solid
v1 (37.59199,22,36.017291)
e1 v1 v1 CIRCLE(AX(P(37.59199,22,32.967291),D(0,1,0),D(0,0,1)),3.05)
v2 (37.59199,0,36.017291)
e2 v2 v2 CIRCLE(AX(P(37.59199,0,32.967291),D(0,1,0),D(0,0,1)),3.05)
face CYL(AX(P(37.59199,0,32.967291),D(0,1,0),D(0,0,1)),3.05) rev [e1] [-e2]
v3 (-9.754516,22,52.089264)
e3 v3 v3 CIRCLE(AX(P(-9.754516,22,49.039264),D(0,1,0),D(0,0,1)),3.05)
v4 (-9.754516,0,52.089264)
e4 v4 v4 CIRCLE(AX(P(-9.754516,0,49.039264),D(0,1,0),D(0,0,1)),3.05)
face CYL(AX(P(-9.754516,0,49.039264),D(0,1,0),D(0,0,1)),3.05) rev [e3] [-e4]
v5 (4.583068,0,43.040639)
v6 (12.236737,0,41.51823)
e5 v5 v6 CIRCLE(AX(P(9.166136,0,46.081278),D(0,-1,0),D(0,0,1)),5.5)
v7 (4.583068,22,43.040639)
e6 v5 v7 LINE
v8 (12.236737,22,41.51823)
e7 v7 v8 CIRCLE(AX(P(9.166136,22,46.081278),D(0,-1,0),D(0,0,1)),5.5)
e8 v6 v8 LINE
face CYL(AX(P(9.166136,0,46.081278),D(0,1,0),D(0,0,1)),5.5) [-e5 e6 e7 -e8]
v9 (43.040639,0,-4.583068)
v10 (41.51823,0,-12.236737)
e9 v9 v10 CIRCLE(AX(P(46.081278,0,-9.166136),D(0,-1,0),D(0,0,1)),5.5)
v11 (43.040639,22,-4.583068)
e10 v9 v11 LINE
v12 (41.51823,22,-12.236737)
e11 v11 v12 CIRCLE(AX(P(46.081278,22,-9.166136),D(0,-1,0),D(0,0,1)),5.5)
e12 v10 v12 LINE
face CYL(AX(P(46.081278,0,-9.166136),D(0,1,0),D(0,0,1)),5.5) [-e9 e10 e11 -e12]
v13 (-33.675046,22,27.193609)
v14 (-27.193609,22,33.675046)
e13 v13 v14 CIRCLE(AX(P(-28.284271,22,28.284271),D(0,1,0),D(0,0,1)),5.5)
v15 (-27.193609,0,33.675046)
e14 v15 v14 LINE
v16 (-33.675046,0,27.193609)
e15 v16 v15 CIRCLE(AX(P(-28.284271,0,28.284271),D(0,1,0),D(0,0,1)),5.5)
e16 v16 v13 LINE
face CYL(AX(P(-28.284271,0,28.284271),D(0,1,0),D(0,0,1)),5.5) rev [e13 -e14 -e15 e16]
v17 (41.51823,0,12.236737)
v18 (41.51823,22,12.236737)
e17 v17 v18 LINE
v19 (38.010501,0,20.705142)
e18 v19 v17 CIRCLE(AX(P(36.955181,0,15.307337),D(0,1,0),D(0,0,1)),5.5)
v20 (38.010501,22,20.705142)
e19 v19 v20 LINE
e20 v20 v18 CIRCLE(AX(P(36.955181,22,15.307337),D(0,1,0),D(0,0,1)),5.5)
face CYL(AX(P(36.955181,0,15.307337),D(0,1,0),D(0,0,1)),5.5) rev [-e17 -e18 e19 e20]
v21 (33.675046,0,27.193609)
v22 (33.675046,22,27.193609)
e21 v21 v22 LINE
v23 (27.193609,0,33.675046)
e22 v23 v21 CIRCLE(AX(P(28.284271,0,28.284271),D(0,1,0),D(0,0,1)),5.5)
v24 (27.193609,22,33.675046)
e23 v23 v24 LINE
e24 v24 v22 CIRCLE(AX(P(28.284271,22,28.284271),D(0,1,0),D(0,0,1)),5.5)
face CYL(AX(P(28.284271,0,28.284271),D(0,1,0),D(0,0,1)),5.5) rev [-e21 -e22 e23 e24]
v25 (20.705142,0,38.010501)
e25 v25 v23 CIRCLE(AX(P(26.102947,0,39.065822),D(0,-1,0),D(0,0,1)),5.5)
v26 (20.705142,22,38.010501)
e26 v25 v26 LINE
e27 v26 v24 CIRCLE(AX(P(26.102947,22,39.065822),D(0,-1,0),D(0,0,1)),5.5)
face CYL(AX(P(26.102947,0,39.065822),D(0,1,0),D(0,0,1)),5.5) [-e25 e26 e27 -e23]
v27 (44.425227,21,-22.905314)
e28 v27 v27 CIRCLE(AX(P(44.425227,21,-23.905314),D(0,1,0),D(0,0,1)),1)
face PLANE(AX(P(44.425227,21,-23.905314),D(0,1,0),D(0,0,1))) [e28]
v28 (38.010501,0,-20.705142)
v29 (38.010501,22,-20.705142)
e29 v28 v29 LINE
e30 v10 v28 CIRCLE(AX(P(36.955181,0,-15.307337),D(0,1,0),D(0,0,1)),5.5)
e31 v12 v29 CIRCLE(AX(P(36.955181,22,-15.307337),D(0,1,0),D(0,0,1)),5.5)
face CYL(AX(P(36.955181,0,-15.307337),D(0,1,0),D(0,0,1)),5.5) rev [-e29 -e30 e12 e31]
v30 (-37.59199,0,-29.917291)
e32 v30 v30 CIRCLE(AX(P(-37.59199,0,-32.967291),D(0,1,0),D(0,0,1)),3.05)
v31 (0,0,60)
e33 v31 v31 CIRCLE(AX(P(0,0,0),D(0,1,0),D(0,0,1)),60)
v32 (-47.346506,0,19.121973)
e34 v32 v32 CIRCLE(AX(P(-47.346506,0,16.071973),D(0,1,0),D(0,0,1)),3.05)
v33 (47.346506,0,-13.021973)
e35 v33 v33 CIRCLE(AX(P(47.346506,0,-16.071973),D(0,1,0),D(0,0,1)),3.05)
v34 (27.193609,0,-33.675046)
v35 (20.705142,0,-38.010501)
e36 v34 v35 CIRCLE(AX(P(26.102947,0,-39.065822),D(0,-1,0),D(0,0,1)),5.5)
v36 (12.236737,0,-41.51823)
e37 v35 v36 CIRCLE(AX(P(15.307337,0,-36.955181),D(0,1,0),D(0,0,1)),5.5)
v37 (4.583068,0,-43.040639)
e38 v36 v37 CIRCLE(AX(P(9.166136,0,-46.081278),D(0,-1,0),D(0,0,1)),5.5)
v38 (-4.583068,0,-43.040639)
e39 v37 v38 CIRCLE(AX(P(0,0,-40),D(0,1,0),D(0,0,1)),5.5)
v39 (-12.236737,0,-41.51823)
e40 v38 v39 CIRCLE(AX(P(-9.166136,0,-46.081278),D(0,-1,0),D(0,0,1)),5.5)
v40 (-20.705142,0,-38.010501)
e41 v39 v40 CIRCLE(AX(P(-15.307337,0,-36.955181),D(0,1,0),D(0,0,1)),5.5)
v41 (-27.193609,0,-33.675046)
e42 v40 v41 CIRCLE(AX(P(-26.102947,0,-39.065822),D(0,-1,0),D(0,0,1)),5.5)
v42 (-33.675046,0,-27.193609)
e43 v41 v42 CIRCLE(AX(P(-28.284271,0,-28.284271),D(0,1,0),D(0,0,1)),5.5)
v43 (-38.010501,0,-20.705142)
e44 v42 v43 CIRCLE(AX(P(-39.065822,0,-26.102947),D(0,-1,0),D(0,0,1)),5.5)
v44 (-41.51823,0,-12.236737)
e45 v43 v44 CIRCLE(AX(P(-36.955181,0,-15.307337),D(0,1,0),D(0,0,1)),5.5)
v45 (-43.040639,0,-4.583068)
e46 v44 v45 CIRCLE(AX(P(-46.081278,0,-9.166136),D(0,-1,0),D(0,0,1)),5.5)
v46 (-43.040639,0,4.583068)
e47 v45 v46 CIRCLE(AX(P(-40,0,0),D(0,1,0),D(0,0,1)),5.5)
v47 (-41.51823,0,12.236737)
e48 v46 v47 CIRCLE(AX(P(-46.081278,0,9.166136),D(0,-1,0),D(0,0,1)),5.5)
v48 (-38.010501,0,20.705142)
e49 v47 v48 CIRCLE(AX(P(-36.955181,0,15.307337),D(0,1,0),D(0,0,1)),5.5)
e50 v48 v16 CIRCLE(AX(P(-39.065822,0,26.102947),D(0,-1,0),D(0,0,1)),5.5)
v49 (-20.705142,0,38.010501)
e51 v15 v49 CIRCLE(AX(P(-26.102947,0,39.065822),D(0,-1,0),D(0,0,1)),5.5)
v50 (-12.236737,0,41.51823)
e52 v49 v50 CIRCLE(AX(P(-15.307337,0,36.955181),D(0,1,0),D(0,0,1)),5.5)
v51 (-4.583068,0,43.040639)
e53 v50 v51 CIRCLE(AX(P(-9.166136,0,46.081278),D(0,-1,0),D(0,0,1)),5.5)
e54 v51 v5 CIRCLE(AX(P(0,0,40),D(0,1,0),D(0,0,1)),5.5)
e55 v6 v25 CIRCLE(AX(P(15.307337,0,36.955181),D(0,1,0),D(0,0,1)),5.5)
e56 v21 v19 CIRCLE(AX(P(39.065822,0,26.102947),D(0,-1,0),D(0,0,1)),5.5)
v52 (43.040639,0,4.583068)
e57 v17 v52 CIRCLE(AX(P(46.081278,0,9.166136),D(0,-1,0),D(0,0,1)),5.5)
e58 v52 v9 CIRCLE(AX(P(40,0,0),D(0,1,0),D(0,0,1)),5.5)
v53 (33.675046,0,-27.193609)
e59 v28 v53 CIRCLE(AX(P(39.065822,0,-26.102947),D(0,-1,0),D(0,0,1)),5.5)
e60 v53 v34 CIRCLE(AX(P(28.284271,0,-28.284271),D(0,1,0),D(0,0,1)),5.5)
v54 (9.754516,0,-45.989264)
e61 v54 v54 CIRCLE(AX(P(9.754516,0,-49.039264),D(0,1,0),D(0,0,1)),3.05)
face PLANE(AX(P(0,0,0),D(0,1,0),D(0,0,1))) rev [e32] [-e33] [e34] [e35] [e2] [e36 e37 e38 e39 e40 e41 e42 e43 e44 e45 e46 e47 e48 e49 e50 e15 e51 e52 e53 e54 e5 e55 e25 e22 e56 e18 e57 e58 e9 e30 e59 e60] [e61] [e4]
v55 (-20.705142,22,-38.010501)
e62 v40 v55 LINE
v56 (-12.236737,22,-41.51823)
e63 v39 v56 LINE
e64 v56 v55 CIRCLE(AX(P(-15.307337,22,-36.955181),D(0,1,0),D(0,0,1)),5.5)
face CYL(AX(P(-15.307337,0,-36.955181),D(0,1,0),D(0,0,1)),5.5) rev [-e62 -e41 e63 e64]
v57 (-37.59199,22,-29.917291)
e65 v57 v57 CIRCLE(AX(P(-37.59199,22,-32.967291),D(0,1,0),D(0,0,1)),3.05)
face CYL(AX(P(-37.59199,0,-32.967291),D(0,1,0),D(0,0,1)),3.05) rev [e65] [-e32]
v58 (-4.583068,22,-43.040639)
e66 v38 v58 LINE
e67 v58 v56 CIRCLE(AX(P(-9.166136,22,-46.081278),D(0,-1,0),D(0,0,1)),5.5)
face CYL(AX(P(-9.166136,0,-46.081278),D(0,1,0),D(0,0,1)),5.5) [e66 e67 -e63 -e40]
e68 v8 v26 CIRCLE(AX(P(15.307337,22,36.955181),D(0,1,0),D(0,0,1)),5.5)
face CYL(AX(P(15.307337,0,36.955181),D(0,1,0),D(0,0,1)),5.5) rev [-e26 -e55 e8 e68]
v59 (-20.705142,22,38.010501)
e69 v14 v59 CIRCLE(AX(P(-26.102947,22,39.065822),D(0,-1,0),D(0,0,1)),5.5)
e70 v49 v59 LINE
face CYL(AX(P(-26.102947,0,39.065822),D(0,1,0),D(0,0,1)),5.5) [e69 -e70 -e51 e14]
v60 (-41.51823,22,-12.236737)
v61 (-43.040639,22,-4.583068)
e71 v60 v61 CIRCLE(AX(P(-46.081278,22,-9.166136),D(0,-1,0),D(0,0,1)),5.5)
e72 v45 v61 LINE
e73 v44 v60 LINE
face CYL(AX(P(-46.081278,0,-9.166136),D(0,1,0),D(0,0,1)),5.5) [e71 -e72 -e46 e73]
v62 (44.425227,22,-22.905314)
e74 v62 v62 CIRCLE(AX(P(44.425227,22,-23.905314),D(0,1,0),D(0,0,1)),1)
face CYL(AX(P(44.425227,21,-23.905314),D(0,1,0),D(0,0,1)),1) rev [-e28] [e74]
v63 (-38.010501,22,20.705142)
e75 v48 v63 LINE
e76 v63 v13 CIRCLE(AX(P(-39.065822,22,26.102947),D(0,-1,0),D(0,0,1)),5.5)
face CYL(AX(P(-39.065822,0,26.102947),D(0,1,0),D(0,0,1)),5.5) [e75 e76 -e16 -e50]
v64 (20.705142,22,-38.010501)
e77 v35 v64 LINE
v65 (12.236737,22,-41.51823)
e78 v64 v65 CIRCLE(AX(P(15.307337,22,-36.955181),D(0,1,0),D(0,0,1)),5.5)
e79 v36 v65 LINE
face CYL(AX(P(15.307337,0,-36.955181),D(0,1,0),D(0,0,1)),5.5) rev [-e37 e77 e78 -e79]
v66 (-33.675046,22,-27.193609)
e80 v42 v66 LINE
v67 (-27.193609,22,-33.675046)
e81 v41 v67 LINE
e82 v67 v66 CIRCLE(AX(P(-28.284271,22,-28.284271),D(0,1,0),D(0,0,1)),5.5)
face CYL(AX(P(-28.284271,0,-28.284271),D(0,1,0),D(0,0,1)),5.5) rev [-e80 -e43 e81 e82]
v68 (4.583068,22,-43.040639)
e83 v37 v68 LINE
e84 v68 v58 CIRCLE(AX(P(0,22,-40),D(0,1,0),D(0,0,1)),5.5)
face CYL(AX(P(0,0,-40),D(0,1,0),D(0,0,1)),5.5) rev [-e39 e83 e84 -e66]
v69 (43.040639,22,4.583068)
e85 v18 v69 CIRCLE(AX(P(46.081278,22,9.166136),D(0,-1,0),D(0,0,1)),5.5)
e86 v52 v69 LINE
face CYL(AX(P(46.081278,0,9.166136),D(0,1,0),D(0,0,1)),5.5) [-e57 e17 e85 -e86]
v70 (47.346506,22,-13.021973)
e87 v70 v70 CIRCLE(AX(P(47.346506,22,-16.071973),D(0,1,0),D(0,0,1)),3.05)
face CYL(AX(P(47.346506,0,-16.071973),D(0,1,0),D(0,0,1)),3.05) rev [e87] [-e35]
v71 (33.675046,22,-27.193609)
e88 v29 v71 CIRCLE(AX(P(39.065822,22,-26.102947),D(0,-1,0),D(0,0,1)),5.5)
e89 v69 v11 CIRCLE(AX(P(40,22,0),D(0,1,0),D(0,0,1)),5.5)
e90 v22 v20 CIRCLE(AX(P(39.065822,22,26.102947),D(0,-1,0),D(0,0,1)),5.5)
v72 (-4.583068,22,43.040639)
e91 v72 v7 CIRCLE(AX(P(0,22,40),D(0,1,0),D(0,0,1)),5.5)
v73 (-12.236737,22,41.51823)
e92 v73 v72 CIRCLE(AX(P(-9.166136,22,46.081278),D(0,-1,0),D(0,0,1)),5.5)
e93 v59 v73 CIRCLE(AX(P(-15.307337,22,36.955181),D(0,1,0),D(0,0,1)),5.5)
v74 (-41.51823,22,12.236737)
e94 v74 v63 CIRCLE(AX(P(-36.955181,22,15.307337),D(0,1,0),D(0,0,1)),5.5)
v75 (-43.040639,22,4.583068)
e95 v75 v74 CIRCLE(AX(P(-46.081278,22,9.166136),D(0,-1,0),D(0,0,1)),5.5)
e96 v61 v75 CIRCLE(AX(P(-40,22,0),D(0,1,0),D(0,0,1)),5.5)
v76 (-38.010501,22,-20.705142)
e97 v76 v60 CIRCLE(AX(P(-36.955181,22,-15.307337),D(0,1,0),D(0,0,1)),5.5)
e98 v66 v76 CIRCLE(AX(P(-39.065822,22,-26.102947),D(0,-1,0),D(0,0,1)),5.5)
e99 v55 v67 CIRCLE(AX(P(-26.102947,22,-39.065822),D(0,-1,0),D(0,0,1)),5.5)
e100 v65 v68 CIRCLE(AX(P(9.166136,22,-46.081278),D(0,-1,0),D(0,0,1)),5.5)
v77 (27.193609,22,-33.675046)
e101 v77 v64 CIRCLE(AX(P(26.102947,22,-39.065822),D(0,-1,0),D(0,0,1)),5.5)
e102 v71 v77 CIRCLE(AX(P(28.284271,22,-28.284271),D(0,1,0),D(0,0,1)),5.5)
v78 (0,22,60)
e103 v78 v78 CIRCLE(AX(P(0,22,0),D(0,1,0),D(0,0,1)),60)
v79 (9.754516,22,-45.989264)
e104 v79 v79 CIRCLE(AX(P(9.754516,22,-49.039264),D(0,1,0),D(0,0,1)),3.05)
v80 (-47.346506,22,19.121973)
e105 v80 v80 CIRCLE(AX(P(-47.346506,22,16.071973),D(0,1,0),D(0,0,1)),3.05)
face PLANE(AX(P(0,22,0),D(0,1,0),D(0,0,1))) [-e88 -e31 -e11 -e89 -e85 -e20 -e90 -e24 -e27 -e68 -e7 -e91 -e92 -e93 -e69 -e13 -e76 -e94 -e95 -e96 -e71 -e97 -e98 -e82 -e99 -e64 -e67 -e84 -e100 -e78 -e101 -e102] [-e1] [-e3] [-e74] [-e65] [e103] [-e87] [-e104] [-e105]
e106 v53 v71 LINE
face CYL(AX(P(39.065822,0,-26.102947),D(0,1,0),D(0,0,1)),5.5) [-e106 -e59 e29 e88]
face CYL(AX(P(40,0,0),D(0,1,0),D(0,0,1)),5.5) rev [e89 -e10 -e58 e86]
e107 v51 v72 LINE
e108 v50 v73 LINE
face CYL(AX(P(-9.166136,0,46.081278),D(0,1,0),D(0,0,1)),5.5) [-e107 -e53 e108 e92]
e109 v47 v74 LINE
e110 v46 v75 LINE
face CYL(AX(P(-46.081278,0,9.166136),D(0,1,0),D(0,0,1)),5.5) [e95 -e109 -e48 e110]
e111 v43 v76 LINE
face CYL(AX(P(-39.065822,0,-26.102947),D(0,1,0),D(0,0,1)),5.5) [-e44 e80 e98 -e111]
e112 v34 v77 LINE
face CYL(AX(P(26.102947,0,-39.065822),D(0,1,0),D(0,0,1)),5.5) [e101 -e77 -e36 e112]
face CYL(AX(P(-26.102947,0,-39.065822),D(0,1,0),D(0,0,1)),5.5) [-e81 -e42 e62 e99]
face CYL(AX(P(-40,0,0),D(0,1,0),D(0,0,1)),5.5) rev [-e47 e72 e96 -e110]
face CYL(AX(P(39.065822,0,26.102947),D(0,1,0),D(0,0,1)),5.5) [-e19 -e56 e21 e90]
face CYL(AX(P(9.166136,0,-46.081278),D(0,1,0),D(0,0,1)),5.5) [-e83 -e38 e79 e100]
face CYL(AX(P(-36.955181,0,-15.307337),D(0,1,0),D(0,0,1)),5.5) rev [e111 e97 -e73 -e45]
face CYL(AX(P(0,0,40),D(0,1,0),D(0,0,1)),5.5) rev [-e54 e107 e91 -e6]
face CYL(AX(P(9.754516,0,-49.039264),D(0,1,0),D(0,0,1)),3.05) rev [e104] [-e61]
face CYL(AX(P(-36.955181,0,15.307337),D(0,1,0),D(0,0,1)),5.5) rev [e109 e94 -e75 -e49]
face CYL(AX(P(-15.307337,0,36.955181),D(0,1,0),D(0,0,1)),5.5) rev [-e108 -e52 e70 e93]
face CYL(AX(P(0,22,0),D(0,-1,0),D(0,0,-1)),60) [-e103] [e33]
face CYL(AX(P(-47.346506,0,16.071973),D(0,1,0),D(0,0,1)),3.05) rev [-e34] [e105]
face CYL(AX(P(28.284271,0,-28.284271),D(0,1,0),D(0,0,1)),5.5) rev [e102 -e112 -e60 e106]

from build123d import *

# Parameters (mm, degrees)
SKETCH1_R           = 60
BOSS_EXTRUDE1_DEPTH = 22
FILLET1_R           = 5
FILLET2_R           = 6
SKETCH3_R           = 3.05
CUT_EXTRUDE1_DEPTH  = 88.658428165
SKETCH9_R           = 1
CUT_EXTRUDE5_DEPTH  = 1
CUT_EXTRUDE7_DEPTH  = 88.658428165


with BuildPart() as part:
    # Sketch1 → Boss-Extrude1 (new body)
    with BuildSketch(Plane(origin=(0, 0, 0), x_dir=(1, 0, 0), z_dir=(0, 1, 0))):
        with Locations(Location((0, 0, 0), (0, 0, 270))):
            Circle(SKETCH1_R)
        with BuildLine():
            ThreePointArc((-31.591922188, 24.534678569), (-33.258784492, 22.222809321), (-34.756792584, 19.798115295))
            ThreePointArc((-34.756792584, 19.798115295), (-41.574578963, 17.220754456), (-38.576145309, 10.577382149))
            ThreePointArc((-38.576145309, 10.577382149), (-39.231411216, 7.803612881), (-39.6875, 4.99022482))
            ThreePointArc((-39.6875, 4.99022482), (-45, 0), (-39.6875, -4.99022482))
            ThreePointArc((-39.6875, -4.99022482), (-39.231411216, -7.803612881), (-38.576145309, -10.577382149))
            ThreePointArc((-38.576145309, -10.577382149), (-41.574578963, -17.220754456), (-34.756792584, -19.798115295))
            ThreePointArc((-34.756792584, -19.798115295), (-33.258784492, -22.222809321), (-31.591922188, -24.534678569))
            ThreePointArc((-31.591922188, -24.534678569), (-31.819805153, -31.819805153), (-24.534678569, -31.591922188))
            ThreePointArc((-24.534678569, -31.591922188), (-22.222809321, -33.258784492), (-19.798115295, -34.756792584))
            ThreePointArc((-19.798115295, -34.756792584), (-17.220754456, -41.574578963), (-10.577382149, -38.576145309))
            ThreePointArc((-10.577382149, -38.576145309), (-7.803612881, -39.231411216), (-4.99022482, -39.6875))
            ThreePointArc((-4.99022482, -39.6875), (0, -45), (4.99022482, -39.6875))
            ThreePointArc((4.99022482, -39.6875), (7.803612881, -39.231411216), (10.577382149, -38.576145309))
            ThreePointArc((10.577382149, -38.576145309), (17.220754456, -41.574578963), (19.798115295, -34.756792584))
            ThreePointArc((19.798115295, -34.756792584), (22.222809321, -33.258784492), (24.534678569, -31.591922188))
            ThreePointArc((24.534678569, -31.591922188), (31.819805153, -31.819805153), (31.591922188, -24.534678569))
            ThreePointArc((31.591922188, -24.534678569), (33.258784492, -22.222809321), (34.756792584, -19.798115295))
            ThreePointArc((34.756792584, -19.798115295), (41.574578963, -17.220754456), (38.576145309, -10.577382149))
            ThreePointArc((38.576145309, -10.577382149), (39.231411216, -7.803612881), (39.6875, -4.99022482))
            ThreePointArc((39.6875, -4.99022482), (45, 0), (39.6875, 4.99022482))
            ThreePointArc((39.6875, 4.99022482), (39.231411216, 7.803612881), (38.576145309, 10.577382149))
            ThreePointArc((38.576145309, 10.577382149), (41.574578963, 17.220754456), (34.756792584, 19.798115295))
            ThreePointArc((34.756792584, 19.798115295), (33.258784492, 22.222809321), (31.591922188, 24.534678569))
            ThreePointArc((31.591922188, 24.534678569), (31.819805153, 31.819805153), (24.534678569, 31.591922188))
            ThreePointArc((24.534678569, 31.591922188), (22.222809321, 33.258784492), (19.798115295, 34.756792584))
            ThreePointArc((19.798115295, 34.756792584), (17.220754456, 41.574578963), (10.577382149, 38.576145309))
            ThreePointArc((10.577382149, 38.576145309), (7.803612881, 39.231411216), (4.99022482, 39.6875))
            ThreePointArc((4.99022482, 39.6875), (0, 45), (-4.99022482, 39.6875))
            ThreePointArc((-4.99022482, 39.6875), (-7.803612881, 39.231411216), (-10.577382149, 38.576145309))
            ThreePointArc((-10.577382149, 38.576145309), (-17.220754456, 41.574578963), (-19.798115295, 34.756792584))
            ThreePointArc((-19.798115295, 34.756792584), (-22.222809321, 33.258784492), (-24.534678569, 31.591922188))
            ThreePointArc((-24.534678569, 31.591922188), (-31.819805153, 31.819805153), (-31.591922188, 24.534678569))
        make_face(mode=Mode.SUBTRACT)
    extrude(amount=BOSS_EXTRUDE1_DEPTH)

    # Fillet1
    # the kernel refuses this fillet: 5 mm, written as the material it takes off along each edge
    with BuildSketch(Plane(origin=(-31.591922188, -7.937782114, -24.534678569), x_dir=(-0.5708127348451637, 0, -0.8210802772802334), z_dir=(0, 1, 0))) as fillet1_piece_1:
        with BuildLine():
            CenterArc((3.572001951, 4.856162203), FILLET1_R, 201.908932705, 54.314665287)
            ThreePointArc((-1.066888508, 2.990500041), (-0.503760138, 1.505840103), (0, 0))
            ThreePointArc((0, 0), (1.190667317, 0.143837797), (2.381334634, 0))
        make_face()
    extrude(amount=37.875564228, mode=Mode.SUBTRACT)
    with BuildSketch(Plane(origin=(-34.756792584, -7.937782114, -19.798115295), x_dir=(-0.977019839336146, 0, -0.21314838386338178), z_dir=(0, 1, 0)), Plane(origin=(10.577382149, -7.937782114, 38.576145309), x_dir=(0.5401386861196337, 0, 0.8415760213771278), z_dir=(0, 1, 0)), Plane(origin=(-4.99022482, -7.937782114, 39.6875), x_dir=(0.176965876366712, 0, 0.984216987560041), z_dir=(0, 1, 0)), Plane(origin=(-19.798115295, -7.937782114, 34.756792584), x_dir=(-0.21314838386337953, 0, 0.9770198393361466), z_dir=(0, 1, 0)), Plane(origin=(-31.591922188, -7.937782114, 24.534678569), x_dir=(-0.5708127348451787, 0, 0.8210802772802229), z_dir=(0, 1, 0)), Plane(origin=(-38.576145309, -7.937782114, 10.577382149), x_dir=(-0.84157602137713, 0, 0.5401386861196305), z_dir=(0, 1, 0)), Plane(origin=(-39.6875, -7.937782114, -4.99022482), x_dir=(-0.9842169875600411, 0, 0.17696587636671054), z_dir=(0, 1, 0)), Plane(origin=(24.534678569, -7.937782114, 31.591922188), x_dir=(0.8210802772802258, 0, 0.5708127348451744), z_dir=(0, 1, 0)), Plane(origin=(34.756792584, -7.937782114, 19.798115295), x_dir=(0.9770198393361469, 0, 0.2131483838633775), z_dir=(0, 1, 0)), Plane(origin=(39.6875, -7.937782114, 4.99022482), x_dir=(0.9842169875600401, 0, -0.1769658763667165), z_dir=(0, 1, 0)), Plane(origin=(38.576145309, -7.937782114, -10.577382149), x_dir=(0.8415760213771245, 0, -0.5401386861196388), z_dir=(0, 1, 0)), Plane(origin=(31.591922188, -7.937782114, -24.534678569), x_dir=(0.5708127348451758, 0, -0.8210802772802248), z_dir=(0, 1, 0)), Plane(origin=(19.798115295, -7.937782114, -34.756792584), x_dir=(0.21314838386337198, 0, -0.9770198393361482), z_dir=(0, 1, 0)), Plane(origin=(4.99022482, -7.937782114, -39.6875), x_dir=(-0.17696587636672031, 0, -0.9842169875600394), z_dir=(0, 1, 0)), Plane(origin=(-10.577382149, -7.937782114, -38.576145309), x_dir=(-0.5401386861196261, 0, -0.8415760213771326), z_dir=(0, 1, 0)), Plane(origin=(-24.534678569, -7.937782114, -31.591922188), x_dir=(-0.82108027728022, 0, -0.5708127348451829), z_dir=(0, 1, 0))) as fillet1_piece_2:
        with BuildLine():
            CenterArc((3.572001951, -4.856162203), FILLET1_R, 103.776402008, 54.314665287)
            ThreePointArc((-1.066888508, -2.990500041), (-0.503760138, -1.505840103), (0, 0))
            ThreePointArc((0, 0), (1.190667317, -0.143837797), (2.381334634, 0))
        make_face()
    extrude(amount=37.875564228, mode=Mode.SUBTRACT)
    with BuildSketch(Plane(origin=(4.99022482, -7.937782114, 39.6875), x_dir=(0.9864543257067245, 0, -0.1640361645933343), z_dir=(0, 1, 0)), Plane(origin=(-10.577382149, -7.937782114, 38.576145309), x_dir=(0.9741388837762464, 0, 0.22595007217340898), z_dir=(0, 1, 0)), Plane(origin=(-24.534678569, -7.937782114, 31.591922188), x_dir=(0.8135196273818055, 0, 0.5815374586942516), z_dir=(0, 1, 0)), Plane(origin=(-34.756792584, -7.937782114, 19.798115295), x_dir=(0.5290493822922732, 0, 0.8485910387790836), z_dir=(0, 1, 0)), Plane(origin=(-39.6875, -7.937782114, 4.99022482), x_dir=(0.1640361645933272, 0, 0.9864543257067256), z_dir=(0, 1, 0)), Plane(origin=(-38.576145309, -7.937782114, -10.577382149), x_dir=(-0.22595007217340937, 0, 0.9741388837762464), z_dir=(0, 1, 0)), Plane(origin=(19.798115295, -7.937782114, 34.756792584), x_dir=(0.8485910387790846, 0, -0.5290493822922715), z_dir=(0, 1, 0)), Plane(origin=(31.591922188, -7.937782114, 24.534678569), x_dir=(0.5815374586942491, 0, -0.8135196273818073), z_dir=(0, 1, 0)), Plane(origin=(38.576145309, -7.937782114, 10.577382149), x_dir=(0.22595007217340277, 0, -0.9741388837762479), z_dir=(0, 1, 0)), Plane(origin=(39.6875, -7.937782114, -4.99022482), x_dir=(-0.16403616459333684, 0, -0.9864543257067241), z_dir=(0, 1, 0)), Plane(origin=(34.756792584, -7.937782114, -19.798115295), x_dir=(-0.5290493822922758, 0, -0.8485910387790819), z_dir=(0, 1, 0)), Plane(origin=(24.534678569, -7.937782114, -31.591922188), x_dir=(-0.8135196273818096, 0, -0.5815374586942458), z_dir=(0, 1, 0)), Plane(origin=(10.577382149, -7.937782114, -38.576145309), x_dir=(-0.9741388837762485, 0, -0.22595007217340046), z_dir=(0, 1, 0)), Plane(origin=(-4.99022482, -7.937782114, -39.6875), x_dir=(-0.9864543257067236, 0, 0.16403616459333964), z_dir=(0, 1, 0)), Plane(origin=(-19.798115295, -7.937782114, -34.756792584), x_dir=(-0.8485910387790874, 0, 0.5290493822922673), z_dir=(0, 1, 0))) as fillet1_piece_3:
        with BuildLine():
            CenterArc((3.373557398, -4.996060424), FILLET1_R, 92.274604499, 54.314665287)
            ThreePointArc((-0.800166381, -2.24287503), (-0.264608655, -1.169769307), (0, 0))
            ThreePointArc((0, 0), (1.587556423, -0.031516609), (3.175112846, 0))
        make_face()
    extrude(amount=37.875564228, mode=Mode.SUBTRACT)

    # Fillet2
    fillet2_edges = [part.edges().sort_by_distance(p)[0] for p in [
        (-7.805937782, 11, 39.243099283),
        (7.805937782, 11, 39.243099283),
        (22.229430079, 11, 33.268693157),
        (33.268693157, 11, 22.229430079),
        (-22.229430079, 11, 33.268693157),
        (-33.268693157, 11, 22.229430079),
        (-39.243099283, 11, 7.805937782),
        (-39.243099283, 11, -7.805937782),
        (39.243099283, 11, 7.805937782),
        (39.243099283, 11, -7.805937782),
        (33.268693157, 11, -22.229430079),
        (22.229430079, 11, -33.268693157),
        (7.805937782, 11, -39.243099283),
        (-7.805937782, 11, -39.243099283),
        (-22.229430079, 11, -33.268693157),
        (-33.268693157, 11, -22.229430079),
    ]]
    fillet(fillet2_edges, radius=FILLET2_R)

    # Sketch3 → Cut-Extrude1 (cut, through all)
    with BuildSketch(Plane(origin=(0, 22, 0), x_dir=(1, 0, 0), z_dir=(0, 1, 0))):
        with Locations(Location((9.754516101, 49.03926402, 0), (0, 0, 270))):
            Circle(SKETCH3_R)
        with Locations(Location((47.346506475, 16.071973265, 0), (0, 0, 270))):
            Circle(SKETCH3_R)
        with Locations(Location((37.591990374, -32.967290755, 0), (0, 0, 270))):
            Circle(SKETCH3_R)
        with Locations(Location((-9.754516101, -49.03926402, 0), (0, 0, 270))):
            Circle(SKETCH3_R)
        with Locations(Location((-47.346506475, -16.071973265, 0), (0, 0, 270))):
            Circle(SKETCH3_R)
        with Locations(Location((-37.591990374, 32.967290755, 0), (0, 0, 270))):
            Circle(SKETCH3_R)
    extrude(amount=-CUT_EXTRUDE1_DEPTH, mode=Mode.SUBTRACT)

    # Sketch9 → Cut-Extrude5 (cut)
    with BuildSketch(Plane(origin=(0, 22, 0), x_dir=(1, 0, 0), z_dir=(0, 1, 0))):
        with Locations(Location((44.425227151, 23.905313753, 0), (0, 0, 270))):
            Circle(SKETCH9_R)
    extrude(amount=-CUT_EXTRUDE5_DEPTH, mode=Mode.SUBTRACT)

    # Sketch11 → Cut-Extrude7 (cut, through all)
    with BuildSketch(Plane(origin=(0, 22, 0), x_dir=(1, 0, 0), z_dir=(0, 1, 0))):
        with BuildLine():
            ThreePointArc((-43.040639218, 4.583068093), (-45.5, 0), (-43.040639218, -4.583068093))
            ThreePointArc((-43.040639218, -4.583068093), (-40.686959394, -8.093139415), (-41.518229869, -12.23673674))
            ThreePointArc((-41.518229869, -12.23673674), (-42.036518729, -17.412096173), (-38.010501411, -20.705142354))
            ThreePointArc((-38.010501411, -20.705142354), (-34.492738655, -23.047311133), (-33.675046385, -27.193609331))
            ThreePointArc((-33.675046385, -27.193609331), (-32.173358544, -32.173358544), (-27.193609331, -33.675046385))
            ThreePointArc((-27.193609331, -33.675046385), (-23.047311133, -34.492738655), (-20.705142354, -38.010501411))
            ThreePointArc((-20.705142354, -38.010501411), (-17.412096173, -42.036518729), (-12.23673674, -41.518229869))
            ThreePointArc((-12.23673674, -41.518229869), (-8.093139415, -40.686959394), (-4.583068093, -43.040639218))
            ThreePointArc((-4.583068093, -43.040639218), (0, -45.5), (4.583068093, -43.040639218))
            ThreePointArc((4.583068093, -43.040639218), (8.093139415, -40.686959394), (12.23673674, -41.518229869))
            ThreePointArc((12.23673674, -41.518229869), (17.412096173, -42.036518729), (20.705142354, -38.010501411))
            ThreePointArc((20.705142354, -38.010501411), (23.047311133, -34.492738655), (27.193609331, -33.675046385))
            ThreePointArc((27.193609331, -33.675046385), (32.173358544, -32.173358544), (33.675046385, -27.193609331))
            ThreePointArc((33.675046385, -27.193609331), (34.492738655, -23.047311133), (38.010501411, -20.705142354))
            ThreePointArc((38.010501411, -20.705142354), (42.036518729, -17.412096173), (41.518229869, -12.23673674))
            ThreePointArc((41.518229869, -12.23673674), (40.686959394, -8.093139415), (43.040639218, -4.583068093))
            ThreePointArc((43.040639218, -4.583068093), (45.5, 0), (43.040639218, 4.583068093))
            ThreePointArc((43.040639218, 4.583068093), (40.686959394, 8.093139415), (41.518229869, 12.23673674))
            ThreePointArc((41.518229869, 12.23673674), (42.036518729, 17.412096173), (38.010501411, 20.705142354))
            ThreePointArc((38.010501411, 20.705142354), (34.492738655, 23.047311133), (33.675046385, 27.193609331))
            ThreePointArc((33.675046385, 27.193609331), (32.173358544, 32.173358544), (27.193609331, 33.675046385))
            ThreePointArc((27.193609331, 33.675046385), (23.047311133, 34.492738655), (20.705142354, 38.010501411))
            ThreePointArc((20.705142354, 38.010501411), (17.412096173, 42.036518729), (12.23673674, 41.518229869))
            ThreePointArc((12.23673674, 41.518229869), (8.093139415, 40.686959394), (4.583068093, 43.040639218))
            ThreePointArc((4.583068093, 43.040639218), (0, 45.5), (-4.583068093, 43.040639218))
            ThreePointArc((-4.583068093, 43.040639218), (-8.093139415, 40.686959394), (-12.23673674, 41.518229869))
            ThreePointArc((-12.23673674, 41.518229869), (-17.412096173, 42.036518729), (-20.705142354, 38.010501411))
            ThreePointArc((-20.705142354, 38.010501411), (-23.047311133, 34.492738655), (-27.193609331, 33.675046385))
            ThreePointArc((-27.193609331, 33.675046385), (-32.173358544, 32.173358544), (-33.675046385, 27.193609331))
            ThreePointArc((-33.675046385, 27.193609331), (-34.492738655, 23.047311133), (-38.010501411, 20.705142354))
            ThreePointArc((-38.010501411, 20.705142354), (-42.036518729, 17.412096173), (-41.518229869, 12.23673674))
            ThreePointArc((-41.518229869, 12.23673674), (-40.686959394, 8.093139415), (-43.040639218, 4.583068093))
        make_face()
    extrude(amount=-CUT_EXTRUDE7_DEPTH, mode=Mode.SUBTRACT)


solid = part.part
